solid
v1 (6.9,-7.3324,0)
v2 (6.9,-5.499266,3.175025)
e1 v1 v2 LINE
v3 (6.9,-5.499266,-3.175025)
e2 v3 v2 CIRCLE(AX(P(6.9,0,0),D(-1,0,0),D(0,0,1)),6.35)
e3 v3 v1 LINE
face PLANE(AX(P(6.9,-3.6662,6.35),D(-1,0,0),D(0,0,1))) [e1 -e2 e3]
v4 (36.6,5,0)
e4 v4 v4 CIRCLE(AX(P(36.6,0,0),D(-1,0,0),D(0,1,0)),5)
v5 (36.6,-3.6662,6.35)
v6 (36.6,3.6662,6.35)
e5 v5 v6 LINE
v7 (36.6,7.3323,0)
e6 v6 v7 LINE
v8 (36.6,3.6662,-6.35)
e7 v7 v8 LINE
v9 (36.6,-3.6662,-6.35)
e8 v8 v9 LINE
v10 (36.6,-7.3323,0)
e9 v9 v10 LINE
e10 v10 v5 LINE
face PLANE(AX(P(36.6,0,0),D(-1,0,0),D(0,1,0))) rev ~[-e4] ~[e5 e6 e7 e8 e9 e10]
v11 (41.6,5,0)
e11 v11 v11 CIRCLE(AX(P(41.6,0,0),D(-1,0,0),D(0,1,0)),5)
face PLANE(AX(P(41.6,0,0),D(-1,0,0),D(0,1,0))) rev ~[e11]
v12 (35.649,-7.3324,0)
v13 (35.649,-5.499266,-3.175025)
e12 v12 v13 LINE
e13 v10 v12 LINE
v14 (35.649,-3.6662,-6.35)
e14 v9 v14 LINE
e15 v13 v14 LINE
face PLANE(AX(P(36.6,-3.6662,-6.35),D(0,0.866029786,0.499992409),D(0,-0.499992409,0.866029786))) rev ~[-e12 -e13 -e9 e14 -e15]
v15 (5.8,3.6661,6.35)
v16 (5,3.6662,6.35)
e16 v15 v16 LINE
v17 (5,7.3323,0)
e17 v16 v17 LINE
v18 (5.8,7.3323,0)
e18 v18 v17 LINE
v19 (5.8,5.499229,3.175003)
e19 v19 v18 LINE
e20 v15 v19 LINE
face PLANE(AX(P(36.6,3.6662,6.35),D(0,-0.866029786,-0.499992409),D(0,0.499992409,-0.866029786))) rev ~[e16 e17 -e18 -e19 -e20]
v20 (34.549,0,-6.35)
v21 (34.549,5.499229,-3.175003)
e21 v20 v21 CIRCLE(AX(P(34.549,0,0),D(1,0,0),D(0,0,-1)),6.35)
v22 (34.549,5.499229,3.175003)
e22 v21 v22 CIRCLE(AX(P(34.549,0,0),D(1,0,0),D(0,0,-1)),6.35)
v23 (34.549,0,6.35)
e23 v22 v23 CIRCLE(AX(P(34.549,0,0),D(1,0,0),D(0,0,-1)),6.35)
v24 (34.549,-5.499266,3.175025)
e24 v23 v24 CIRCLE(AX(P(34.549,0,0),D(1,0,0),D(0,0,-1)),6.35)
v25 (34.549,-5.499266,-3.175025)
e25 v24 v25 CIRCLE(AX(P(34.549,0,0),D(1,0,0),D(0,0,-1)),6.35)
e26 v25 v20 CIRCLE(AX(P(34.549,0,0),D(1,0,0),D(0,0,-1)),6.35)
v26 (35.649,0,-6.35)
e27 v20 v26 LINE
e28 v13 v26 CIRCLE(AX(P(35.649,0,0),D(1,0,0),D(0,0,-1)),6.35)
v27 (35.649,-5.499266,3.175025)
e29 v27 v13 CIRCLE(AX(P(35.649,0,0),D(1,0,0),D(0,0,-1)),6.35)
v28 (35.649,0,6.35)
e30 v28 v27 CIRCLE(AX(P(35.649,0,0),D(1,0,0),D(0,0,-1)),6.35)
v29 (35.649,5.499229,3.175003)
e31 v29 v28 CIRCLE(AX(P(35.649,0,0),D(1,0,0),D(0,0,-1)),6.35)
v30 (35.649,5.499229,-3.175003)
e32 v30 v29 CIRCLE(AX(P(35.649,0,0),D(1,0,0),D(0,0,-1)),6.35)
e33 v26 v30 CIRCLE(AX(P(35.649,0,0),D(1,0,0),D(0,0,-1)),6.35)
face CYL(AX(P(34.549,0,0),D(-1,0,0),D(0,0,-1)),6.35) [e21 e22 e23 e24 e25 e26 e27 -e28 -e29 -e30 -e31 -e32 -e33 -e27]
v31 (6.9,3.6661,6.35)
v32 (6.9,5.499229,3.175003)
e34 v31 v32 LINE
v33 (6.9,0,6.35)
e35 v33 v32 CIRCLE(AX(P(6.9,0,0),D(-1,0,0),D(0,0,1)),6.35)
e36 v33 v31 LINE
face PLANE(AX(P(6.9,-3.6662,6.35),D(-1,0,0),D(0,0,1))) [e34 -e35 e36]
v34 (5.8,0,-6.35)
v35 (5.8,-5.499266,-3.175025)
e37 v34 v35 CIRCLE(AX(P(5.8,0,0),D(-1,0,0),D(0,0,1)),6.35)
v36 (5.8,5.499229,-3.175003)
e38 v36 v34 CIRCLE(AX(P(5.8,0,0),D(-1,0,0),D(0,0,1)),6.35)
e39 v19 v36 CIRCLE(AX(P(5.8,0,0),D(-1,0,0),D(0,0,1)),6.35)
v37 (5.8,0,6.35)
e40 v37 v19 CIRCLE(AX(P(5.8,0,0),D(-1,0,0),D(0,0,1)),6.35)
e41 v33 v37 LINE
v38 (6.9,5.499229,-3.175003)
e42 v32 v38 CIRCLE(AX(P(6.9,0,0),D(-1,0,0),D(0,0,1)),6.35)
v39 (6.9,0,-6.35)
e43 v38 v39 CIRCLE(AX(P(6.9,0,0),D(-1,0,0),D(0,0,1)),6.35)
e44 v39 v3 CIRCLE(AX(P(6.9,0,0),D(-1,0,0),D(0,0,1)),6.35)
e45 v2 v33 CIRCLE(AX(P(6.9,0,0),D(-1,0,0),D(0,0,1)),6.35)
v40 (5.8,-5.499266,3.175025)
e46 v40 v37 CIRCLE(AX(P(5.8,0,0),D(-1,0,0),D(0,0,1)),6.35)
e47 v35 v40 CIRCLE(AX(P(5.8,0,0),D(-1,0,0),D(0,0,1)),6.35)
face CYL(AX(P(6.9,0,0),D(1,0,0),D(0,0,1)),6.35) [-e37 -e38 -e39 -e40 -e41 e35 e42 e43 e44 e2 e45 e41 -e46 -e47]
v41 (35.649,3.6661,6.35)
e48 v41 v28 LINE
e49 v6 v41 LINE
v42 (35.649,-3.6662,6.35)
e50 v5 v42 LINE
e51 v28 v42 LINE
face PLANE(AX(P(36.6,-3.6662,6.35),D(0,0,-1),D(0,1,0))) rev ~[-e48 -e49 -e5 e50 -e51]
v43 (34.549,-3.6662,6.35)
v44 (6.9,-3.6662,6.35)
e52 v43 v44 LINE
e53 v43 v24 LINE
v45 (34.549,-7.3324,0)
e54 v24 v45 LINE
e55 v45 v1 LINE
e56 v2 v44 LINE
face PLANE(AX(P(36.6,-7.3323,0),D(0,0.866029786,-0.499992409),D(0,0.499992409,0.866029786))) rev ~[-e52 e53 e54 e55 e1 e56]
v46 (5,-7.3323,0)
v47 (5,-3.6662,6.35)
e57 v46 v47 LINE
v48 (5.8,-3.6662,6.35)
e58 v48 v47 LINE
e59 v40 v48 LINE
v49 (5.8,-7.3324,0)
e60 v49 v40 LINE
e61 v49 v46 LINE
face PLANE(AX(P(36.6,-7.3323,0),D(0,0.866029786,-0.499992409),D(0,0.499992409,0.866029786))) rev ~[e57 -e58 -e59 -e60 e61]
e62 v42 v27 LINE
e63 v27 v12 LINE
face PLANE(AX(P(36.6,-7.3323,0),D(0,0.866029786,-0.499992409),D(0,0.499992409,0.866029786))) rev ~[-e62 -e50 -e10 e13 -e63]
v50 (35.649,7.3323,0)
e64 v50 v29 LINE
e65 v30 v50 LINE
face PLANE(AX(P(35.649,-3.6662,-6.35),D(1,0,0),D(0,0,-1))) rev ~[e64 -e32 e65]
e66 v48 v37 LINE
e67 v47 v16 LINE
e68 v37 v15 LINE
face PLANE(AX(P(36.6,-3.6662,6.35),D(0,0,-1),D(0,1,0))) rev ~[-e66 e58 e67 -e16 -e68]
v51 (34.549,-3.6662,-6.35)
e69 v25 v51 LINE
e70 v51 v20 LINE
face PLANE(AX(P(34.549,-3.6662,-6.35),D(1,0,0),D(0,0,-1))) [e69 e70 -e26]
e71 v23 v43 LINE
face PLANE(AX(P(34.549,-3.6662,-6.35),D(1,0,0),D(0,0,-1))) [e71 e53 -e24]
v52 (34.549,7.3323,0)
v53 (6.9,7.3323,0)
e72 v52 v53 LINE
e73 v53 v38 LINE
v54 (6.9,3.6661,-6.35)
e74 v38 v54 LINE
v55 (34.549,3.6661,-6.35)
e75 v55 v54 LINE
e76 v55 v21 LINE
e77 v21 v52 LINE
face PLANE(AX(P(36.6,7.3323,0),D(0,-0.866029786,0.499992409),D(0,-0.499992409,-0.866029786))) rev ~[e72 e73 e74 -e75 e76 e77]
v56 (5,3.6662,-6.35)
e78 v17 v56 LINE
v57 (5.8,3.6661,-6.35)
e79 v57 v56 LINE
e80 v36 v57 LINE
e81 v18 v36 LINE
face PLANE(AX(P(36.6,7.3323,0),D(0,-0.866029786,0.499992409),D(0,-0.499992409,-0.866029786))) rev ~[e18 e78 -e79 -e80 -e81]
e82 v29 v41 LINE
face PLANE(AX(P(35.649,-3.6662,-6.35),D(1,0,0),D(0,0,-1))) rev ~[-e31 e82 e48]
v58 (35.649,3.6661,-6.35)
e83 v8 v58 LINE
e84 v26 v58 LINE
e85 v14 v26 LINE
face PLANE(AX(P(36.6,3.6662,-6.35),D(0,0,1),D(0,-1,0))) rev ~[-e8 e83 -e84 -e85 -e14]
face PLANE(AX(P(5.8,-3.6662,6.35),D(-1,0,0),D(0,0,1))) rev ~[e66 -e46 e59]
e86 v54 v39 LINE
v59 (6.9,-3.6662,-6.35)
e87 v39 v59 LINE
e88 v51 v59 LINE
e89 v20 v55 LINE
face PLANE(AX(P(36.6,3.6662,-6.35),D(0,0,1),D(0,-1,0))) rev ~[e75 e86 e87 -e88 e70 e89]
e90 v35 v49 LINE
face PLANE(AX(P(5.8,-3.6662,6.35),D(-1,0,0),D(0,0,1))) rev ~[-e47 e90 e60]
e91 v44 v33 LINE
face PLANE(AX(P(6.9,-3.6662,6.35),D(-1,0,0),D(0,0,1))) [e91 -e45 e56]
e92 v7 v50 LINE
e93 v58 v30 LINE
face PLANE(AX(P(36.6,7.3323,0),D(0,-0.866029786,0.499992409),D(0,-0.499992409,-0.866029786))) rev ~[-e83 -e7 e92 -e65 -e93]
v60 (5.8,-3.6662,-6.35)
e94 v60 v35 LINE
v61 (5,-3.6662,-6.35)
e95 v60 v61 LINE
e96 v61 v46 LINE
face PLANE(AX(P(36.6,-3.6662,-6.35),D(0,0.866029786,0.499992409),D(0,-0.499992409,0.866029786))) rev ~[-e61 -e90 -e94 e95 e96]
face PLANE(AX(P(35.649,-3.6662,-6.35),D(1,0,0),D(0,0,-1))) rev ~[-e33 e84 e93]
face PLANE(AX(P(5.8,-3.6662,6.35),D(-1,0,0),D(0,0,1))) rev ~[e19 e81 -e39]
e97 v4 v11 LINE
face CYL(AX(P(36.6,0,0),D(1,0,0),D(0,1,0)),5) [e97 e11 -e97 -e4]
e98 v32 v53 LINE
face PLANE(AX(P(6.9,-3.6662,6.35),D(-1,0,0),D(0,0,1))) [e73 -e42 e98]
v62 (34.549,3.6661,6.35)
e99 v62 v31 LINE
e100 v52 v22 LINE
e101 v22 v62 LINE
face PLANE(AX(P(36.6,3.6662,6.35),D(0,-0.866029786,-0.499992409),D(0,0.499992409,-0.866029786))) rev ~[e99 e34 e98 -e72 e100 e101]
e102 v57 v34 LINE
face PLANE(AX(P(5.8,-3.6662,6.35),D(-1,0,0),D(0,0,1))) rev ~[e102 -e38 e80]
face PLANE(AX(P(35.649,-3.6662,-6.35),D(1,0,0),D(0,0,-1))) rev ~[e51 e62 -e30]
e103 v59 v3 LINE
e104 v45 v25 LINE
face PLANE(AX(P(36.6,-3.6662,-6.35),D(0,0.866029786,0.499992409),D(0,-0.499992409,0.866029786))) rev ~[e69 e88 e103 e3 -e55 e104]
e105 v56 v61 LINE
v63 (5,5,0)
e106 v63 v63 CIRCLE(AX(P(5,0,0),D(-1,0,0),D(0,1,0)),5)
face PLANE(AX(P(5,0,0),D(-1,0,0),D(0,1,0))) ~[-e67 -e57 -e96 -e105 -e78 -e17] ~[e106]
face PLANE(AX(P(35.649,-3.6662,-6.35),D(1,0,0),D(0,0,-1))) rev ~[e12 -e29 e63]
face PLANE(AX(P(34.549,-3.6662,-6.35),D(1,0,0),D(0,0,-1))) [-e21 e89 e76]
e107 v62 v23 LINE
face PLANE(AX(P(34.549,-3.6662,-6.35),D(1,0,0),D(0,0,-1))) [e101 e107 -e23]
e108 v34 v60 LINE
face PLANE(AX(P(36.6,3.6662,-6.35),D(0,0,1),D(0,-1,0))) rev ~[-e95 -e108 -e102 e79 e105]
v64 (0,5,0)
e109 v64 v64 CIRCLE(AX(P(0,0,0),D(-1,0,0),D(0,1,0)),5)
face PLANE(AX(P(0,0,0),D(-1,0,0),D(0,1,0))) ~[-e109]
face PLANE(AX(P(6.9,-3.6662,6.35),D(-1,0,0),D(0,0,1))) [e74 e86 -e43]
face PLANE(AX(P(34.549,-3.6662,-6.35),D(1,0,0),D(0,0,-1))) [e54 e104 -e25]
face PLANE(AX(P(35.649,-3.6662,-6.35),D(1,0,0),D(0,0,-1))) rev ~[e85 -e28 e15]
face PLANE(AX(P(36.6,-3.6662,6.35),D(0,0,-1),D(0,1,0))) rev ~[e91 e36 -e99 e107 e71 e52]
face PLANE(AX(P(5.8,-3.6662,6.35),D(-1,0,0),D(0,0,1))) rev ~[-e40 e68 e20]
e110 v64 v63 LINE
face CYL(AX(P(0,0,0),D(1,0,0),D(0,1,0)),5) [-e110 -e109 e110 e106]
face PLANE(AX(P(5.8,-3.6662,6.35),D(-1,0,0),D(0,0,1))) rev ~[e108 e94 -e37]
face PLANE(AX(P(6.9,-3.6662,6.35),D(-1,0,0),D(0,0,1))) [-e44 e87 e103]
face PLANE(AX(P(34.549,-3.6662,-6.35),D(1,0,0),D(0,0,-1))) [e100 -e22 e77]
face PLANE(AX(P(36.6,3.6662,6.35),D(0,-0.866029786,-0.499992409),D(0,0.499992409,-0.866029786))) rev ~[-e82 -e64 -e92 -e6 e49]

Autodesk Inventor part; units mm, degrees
ref_plane "YZ Plane" through (0, 0, 0) normal (1, 0, 0) x (0, 1, 0)
sketch "Sketch1" plane through (0, 0, 0) normal (0, 0, 1) x (1, 0, 0)
  line L0 (0, 0) -> (0, 5)
  line L1 (0, 5) -> (5, 5)
  line L2 (5, 5) -> (5, 8.4186)
  line L3 (5, 8.4186) -> (36.6, 8.4186)
  line L4 (36.6, 8.4186) -> (36.6, 5)
  line L5 (36.6, 5) -> (41.6, 5)
  line L6 (41.6, 5) -> (41.6, 0)
  line L7 (41.6, 0) -> (0, 0)
  dimension "d0" = 31.6
  dimension "d1" = 5
  dimension "d2" = 5
  dimension "d3" = 5
revolve "Revolution1" add sketch "Sketch1" angle 360 about axis through (41.6, 0, 0) along (-1, 0, 0)
sketch "Sketch2" plane through (36.6, 0, 0) normal (1, 0, 0) x (0, 0, -1)
  circle A0 centre (0, 0) radius 5 projected
  line L0 (0, 7.3323) -> (6.35, 3.6662)
  line L1 (6.35, 3.6662) -> (6.35, -3.6662)
  line L2 (6.35, -3.6662) -> (0, -7.3323)
  line L3 (0, -7.3323) -> (-6.35, -3.6662)
  line L4 (-6.35, -3.6662) -> (-6.35, 3.6662)
  line L5 (-6.35, 3.6662) -> (0, 7.3323)
  circle A1 centre (0, 0) radius 5 projected
  circle A2 centre (0, 0) radius 8.4186 projected
  dimension "d5" = 12.7
extrude "Extrusion1" cut sketch "Sketch2" against normal up to surface (31.6 mm away) contours A2
ref_plane "Work Plane1" through (34.549, -3.6662, -6.35) normal (1, 0, 0) x (0, 0, -1)
sketch "Sketch3" plane through (34.549, -3.6662, -6.35) normal (1, 0, 0) x (0, 0, -1)
  circle A0 centre (-6.35, 3.6662) radius 5 projected
  circle A1 centre (-6.35, 3.6662) radius 6.35
  line L0 (0, 7.3323) -> (-6.35, 10.9985) projected
  circle A2 centre (-6.35, 3.6662) radius 5.85
  line L1 (-6.35, -3.6662) -> (0, 0) projected
  line L2 (0, 0) -> (0, 7.3323) projected
  line L3 (0, 7.3323) -> (-6.35, 10.9985) projected
  line L4 (-6.35, 10.9985) -> (-12.7, 7.3323) projected
  line L5 (-12.7, 7.3323) -> (-12.7, 0) projected
  line L6 (-12.7, 0) -> (-6.35, -3.6662) projected
  circle A3 centre (-6.35, 3.6662) radius 5 projected
  dimension "d9" = 0.5
extrude "Extrusion2" cut sketch "Sketch3" along normal blind 1.1 contours L2 L1 A1 | A1 L0 L2 | A1 L4 L0 | L1 L6 A1 | A1 L5 L4 | L6 L5 A1
ref_plane "Work Plane2" through (6.9, -3.6662, 6.35) normal (-1, 0, 0) x (0, 0, 1)
sketch "Sketch4" plane through (6.9, -3.6662, 6.35) normal (-1, 0, 0) x (0, 0, 1)
  line L0 (-12.7, 0) -> (-6.35, -3.6662) projected
  line L1 (-6.35, -3.6662) -> (0, 0) projected
  line L2 (0, 0) -> (0, 7.3323) projected
  line L3 (0, 7.3323) -> (-6.35, 10.9985) projected
  line L4 (-6.35, 10.9985) -> (-12.7, 7.3323) projected
  line L5 (-12.7, 7.3323) -> (-12.7, 0) projected
  circle A0 centre (-6.35, 3.6662) radius 5 projected
  circle A1 centre (-6.35, 3.6662) radius 5 projected
  circle A2 centre (-6.35, 3.6662) radius 6.35
extrude "Extrusion3" cut sketch "Sketch4" along normal blind 1.1 contours L5 A2 L0 | A2 L1 L0 | L5 L4 A2 | A2 L2 L1 | L4 L3 A2 | A2 L3 L2
properties part number "Hex Shaft 1" material "Steel, Mild"
